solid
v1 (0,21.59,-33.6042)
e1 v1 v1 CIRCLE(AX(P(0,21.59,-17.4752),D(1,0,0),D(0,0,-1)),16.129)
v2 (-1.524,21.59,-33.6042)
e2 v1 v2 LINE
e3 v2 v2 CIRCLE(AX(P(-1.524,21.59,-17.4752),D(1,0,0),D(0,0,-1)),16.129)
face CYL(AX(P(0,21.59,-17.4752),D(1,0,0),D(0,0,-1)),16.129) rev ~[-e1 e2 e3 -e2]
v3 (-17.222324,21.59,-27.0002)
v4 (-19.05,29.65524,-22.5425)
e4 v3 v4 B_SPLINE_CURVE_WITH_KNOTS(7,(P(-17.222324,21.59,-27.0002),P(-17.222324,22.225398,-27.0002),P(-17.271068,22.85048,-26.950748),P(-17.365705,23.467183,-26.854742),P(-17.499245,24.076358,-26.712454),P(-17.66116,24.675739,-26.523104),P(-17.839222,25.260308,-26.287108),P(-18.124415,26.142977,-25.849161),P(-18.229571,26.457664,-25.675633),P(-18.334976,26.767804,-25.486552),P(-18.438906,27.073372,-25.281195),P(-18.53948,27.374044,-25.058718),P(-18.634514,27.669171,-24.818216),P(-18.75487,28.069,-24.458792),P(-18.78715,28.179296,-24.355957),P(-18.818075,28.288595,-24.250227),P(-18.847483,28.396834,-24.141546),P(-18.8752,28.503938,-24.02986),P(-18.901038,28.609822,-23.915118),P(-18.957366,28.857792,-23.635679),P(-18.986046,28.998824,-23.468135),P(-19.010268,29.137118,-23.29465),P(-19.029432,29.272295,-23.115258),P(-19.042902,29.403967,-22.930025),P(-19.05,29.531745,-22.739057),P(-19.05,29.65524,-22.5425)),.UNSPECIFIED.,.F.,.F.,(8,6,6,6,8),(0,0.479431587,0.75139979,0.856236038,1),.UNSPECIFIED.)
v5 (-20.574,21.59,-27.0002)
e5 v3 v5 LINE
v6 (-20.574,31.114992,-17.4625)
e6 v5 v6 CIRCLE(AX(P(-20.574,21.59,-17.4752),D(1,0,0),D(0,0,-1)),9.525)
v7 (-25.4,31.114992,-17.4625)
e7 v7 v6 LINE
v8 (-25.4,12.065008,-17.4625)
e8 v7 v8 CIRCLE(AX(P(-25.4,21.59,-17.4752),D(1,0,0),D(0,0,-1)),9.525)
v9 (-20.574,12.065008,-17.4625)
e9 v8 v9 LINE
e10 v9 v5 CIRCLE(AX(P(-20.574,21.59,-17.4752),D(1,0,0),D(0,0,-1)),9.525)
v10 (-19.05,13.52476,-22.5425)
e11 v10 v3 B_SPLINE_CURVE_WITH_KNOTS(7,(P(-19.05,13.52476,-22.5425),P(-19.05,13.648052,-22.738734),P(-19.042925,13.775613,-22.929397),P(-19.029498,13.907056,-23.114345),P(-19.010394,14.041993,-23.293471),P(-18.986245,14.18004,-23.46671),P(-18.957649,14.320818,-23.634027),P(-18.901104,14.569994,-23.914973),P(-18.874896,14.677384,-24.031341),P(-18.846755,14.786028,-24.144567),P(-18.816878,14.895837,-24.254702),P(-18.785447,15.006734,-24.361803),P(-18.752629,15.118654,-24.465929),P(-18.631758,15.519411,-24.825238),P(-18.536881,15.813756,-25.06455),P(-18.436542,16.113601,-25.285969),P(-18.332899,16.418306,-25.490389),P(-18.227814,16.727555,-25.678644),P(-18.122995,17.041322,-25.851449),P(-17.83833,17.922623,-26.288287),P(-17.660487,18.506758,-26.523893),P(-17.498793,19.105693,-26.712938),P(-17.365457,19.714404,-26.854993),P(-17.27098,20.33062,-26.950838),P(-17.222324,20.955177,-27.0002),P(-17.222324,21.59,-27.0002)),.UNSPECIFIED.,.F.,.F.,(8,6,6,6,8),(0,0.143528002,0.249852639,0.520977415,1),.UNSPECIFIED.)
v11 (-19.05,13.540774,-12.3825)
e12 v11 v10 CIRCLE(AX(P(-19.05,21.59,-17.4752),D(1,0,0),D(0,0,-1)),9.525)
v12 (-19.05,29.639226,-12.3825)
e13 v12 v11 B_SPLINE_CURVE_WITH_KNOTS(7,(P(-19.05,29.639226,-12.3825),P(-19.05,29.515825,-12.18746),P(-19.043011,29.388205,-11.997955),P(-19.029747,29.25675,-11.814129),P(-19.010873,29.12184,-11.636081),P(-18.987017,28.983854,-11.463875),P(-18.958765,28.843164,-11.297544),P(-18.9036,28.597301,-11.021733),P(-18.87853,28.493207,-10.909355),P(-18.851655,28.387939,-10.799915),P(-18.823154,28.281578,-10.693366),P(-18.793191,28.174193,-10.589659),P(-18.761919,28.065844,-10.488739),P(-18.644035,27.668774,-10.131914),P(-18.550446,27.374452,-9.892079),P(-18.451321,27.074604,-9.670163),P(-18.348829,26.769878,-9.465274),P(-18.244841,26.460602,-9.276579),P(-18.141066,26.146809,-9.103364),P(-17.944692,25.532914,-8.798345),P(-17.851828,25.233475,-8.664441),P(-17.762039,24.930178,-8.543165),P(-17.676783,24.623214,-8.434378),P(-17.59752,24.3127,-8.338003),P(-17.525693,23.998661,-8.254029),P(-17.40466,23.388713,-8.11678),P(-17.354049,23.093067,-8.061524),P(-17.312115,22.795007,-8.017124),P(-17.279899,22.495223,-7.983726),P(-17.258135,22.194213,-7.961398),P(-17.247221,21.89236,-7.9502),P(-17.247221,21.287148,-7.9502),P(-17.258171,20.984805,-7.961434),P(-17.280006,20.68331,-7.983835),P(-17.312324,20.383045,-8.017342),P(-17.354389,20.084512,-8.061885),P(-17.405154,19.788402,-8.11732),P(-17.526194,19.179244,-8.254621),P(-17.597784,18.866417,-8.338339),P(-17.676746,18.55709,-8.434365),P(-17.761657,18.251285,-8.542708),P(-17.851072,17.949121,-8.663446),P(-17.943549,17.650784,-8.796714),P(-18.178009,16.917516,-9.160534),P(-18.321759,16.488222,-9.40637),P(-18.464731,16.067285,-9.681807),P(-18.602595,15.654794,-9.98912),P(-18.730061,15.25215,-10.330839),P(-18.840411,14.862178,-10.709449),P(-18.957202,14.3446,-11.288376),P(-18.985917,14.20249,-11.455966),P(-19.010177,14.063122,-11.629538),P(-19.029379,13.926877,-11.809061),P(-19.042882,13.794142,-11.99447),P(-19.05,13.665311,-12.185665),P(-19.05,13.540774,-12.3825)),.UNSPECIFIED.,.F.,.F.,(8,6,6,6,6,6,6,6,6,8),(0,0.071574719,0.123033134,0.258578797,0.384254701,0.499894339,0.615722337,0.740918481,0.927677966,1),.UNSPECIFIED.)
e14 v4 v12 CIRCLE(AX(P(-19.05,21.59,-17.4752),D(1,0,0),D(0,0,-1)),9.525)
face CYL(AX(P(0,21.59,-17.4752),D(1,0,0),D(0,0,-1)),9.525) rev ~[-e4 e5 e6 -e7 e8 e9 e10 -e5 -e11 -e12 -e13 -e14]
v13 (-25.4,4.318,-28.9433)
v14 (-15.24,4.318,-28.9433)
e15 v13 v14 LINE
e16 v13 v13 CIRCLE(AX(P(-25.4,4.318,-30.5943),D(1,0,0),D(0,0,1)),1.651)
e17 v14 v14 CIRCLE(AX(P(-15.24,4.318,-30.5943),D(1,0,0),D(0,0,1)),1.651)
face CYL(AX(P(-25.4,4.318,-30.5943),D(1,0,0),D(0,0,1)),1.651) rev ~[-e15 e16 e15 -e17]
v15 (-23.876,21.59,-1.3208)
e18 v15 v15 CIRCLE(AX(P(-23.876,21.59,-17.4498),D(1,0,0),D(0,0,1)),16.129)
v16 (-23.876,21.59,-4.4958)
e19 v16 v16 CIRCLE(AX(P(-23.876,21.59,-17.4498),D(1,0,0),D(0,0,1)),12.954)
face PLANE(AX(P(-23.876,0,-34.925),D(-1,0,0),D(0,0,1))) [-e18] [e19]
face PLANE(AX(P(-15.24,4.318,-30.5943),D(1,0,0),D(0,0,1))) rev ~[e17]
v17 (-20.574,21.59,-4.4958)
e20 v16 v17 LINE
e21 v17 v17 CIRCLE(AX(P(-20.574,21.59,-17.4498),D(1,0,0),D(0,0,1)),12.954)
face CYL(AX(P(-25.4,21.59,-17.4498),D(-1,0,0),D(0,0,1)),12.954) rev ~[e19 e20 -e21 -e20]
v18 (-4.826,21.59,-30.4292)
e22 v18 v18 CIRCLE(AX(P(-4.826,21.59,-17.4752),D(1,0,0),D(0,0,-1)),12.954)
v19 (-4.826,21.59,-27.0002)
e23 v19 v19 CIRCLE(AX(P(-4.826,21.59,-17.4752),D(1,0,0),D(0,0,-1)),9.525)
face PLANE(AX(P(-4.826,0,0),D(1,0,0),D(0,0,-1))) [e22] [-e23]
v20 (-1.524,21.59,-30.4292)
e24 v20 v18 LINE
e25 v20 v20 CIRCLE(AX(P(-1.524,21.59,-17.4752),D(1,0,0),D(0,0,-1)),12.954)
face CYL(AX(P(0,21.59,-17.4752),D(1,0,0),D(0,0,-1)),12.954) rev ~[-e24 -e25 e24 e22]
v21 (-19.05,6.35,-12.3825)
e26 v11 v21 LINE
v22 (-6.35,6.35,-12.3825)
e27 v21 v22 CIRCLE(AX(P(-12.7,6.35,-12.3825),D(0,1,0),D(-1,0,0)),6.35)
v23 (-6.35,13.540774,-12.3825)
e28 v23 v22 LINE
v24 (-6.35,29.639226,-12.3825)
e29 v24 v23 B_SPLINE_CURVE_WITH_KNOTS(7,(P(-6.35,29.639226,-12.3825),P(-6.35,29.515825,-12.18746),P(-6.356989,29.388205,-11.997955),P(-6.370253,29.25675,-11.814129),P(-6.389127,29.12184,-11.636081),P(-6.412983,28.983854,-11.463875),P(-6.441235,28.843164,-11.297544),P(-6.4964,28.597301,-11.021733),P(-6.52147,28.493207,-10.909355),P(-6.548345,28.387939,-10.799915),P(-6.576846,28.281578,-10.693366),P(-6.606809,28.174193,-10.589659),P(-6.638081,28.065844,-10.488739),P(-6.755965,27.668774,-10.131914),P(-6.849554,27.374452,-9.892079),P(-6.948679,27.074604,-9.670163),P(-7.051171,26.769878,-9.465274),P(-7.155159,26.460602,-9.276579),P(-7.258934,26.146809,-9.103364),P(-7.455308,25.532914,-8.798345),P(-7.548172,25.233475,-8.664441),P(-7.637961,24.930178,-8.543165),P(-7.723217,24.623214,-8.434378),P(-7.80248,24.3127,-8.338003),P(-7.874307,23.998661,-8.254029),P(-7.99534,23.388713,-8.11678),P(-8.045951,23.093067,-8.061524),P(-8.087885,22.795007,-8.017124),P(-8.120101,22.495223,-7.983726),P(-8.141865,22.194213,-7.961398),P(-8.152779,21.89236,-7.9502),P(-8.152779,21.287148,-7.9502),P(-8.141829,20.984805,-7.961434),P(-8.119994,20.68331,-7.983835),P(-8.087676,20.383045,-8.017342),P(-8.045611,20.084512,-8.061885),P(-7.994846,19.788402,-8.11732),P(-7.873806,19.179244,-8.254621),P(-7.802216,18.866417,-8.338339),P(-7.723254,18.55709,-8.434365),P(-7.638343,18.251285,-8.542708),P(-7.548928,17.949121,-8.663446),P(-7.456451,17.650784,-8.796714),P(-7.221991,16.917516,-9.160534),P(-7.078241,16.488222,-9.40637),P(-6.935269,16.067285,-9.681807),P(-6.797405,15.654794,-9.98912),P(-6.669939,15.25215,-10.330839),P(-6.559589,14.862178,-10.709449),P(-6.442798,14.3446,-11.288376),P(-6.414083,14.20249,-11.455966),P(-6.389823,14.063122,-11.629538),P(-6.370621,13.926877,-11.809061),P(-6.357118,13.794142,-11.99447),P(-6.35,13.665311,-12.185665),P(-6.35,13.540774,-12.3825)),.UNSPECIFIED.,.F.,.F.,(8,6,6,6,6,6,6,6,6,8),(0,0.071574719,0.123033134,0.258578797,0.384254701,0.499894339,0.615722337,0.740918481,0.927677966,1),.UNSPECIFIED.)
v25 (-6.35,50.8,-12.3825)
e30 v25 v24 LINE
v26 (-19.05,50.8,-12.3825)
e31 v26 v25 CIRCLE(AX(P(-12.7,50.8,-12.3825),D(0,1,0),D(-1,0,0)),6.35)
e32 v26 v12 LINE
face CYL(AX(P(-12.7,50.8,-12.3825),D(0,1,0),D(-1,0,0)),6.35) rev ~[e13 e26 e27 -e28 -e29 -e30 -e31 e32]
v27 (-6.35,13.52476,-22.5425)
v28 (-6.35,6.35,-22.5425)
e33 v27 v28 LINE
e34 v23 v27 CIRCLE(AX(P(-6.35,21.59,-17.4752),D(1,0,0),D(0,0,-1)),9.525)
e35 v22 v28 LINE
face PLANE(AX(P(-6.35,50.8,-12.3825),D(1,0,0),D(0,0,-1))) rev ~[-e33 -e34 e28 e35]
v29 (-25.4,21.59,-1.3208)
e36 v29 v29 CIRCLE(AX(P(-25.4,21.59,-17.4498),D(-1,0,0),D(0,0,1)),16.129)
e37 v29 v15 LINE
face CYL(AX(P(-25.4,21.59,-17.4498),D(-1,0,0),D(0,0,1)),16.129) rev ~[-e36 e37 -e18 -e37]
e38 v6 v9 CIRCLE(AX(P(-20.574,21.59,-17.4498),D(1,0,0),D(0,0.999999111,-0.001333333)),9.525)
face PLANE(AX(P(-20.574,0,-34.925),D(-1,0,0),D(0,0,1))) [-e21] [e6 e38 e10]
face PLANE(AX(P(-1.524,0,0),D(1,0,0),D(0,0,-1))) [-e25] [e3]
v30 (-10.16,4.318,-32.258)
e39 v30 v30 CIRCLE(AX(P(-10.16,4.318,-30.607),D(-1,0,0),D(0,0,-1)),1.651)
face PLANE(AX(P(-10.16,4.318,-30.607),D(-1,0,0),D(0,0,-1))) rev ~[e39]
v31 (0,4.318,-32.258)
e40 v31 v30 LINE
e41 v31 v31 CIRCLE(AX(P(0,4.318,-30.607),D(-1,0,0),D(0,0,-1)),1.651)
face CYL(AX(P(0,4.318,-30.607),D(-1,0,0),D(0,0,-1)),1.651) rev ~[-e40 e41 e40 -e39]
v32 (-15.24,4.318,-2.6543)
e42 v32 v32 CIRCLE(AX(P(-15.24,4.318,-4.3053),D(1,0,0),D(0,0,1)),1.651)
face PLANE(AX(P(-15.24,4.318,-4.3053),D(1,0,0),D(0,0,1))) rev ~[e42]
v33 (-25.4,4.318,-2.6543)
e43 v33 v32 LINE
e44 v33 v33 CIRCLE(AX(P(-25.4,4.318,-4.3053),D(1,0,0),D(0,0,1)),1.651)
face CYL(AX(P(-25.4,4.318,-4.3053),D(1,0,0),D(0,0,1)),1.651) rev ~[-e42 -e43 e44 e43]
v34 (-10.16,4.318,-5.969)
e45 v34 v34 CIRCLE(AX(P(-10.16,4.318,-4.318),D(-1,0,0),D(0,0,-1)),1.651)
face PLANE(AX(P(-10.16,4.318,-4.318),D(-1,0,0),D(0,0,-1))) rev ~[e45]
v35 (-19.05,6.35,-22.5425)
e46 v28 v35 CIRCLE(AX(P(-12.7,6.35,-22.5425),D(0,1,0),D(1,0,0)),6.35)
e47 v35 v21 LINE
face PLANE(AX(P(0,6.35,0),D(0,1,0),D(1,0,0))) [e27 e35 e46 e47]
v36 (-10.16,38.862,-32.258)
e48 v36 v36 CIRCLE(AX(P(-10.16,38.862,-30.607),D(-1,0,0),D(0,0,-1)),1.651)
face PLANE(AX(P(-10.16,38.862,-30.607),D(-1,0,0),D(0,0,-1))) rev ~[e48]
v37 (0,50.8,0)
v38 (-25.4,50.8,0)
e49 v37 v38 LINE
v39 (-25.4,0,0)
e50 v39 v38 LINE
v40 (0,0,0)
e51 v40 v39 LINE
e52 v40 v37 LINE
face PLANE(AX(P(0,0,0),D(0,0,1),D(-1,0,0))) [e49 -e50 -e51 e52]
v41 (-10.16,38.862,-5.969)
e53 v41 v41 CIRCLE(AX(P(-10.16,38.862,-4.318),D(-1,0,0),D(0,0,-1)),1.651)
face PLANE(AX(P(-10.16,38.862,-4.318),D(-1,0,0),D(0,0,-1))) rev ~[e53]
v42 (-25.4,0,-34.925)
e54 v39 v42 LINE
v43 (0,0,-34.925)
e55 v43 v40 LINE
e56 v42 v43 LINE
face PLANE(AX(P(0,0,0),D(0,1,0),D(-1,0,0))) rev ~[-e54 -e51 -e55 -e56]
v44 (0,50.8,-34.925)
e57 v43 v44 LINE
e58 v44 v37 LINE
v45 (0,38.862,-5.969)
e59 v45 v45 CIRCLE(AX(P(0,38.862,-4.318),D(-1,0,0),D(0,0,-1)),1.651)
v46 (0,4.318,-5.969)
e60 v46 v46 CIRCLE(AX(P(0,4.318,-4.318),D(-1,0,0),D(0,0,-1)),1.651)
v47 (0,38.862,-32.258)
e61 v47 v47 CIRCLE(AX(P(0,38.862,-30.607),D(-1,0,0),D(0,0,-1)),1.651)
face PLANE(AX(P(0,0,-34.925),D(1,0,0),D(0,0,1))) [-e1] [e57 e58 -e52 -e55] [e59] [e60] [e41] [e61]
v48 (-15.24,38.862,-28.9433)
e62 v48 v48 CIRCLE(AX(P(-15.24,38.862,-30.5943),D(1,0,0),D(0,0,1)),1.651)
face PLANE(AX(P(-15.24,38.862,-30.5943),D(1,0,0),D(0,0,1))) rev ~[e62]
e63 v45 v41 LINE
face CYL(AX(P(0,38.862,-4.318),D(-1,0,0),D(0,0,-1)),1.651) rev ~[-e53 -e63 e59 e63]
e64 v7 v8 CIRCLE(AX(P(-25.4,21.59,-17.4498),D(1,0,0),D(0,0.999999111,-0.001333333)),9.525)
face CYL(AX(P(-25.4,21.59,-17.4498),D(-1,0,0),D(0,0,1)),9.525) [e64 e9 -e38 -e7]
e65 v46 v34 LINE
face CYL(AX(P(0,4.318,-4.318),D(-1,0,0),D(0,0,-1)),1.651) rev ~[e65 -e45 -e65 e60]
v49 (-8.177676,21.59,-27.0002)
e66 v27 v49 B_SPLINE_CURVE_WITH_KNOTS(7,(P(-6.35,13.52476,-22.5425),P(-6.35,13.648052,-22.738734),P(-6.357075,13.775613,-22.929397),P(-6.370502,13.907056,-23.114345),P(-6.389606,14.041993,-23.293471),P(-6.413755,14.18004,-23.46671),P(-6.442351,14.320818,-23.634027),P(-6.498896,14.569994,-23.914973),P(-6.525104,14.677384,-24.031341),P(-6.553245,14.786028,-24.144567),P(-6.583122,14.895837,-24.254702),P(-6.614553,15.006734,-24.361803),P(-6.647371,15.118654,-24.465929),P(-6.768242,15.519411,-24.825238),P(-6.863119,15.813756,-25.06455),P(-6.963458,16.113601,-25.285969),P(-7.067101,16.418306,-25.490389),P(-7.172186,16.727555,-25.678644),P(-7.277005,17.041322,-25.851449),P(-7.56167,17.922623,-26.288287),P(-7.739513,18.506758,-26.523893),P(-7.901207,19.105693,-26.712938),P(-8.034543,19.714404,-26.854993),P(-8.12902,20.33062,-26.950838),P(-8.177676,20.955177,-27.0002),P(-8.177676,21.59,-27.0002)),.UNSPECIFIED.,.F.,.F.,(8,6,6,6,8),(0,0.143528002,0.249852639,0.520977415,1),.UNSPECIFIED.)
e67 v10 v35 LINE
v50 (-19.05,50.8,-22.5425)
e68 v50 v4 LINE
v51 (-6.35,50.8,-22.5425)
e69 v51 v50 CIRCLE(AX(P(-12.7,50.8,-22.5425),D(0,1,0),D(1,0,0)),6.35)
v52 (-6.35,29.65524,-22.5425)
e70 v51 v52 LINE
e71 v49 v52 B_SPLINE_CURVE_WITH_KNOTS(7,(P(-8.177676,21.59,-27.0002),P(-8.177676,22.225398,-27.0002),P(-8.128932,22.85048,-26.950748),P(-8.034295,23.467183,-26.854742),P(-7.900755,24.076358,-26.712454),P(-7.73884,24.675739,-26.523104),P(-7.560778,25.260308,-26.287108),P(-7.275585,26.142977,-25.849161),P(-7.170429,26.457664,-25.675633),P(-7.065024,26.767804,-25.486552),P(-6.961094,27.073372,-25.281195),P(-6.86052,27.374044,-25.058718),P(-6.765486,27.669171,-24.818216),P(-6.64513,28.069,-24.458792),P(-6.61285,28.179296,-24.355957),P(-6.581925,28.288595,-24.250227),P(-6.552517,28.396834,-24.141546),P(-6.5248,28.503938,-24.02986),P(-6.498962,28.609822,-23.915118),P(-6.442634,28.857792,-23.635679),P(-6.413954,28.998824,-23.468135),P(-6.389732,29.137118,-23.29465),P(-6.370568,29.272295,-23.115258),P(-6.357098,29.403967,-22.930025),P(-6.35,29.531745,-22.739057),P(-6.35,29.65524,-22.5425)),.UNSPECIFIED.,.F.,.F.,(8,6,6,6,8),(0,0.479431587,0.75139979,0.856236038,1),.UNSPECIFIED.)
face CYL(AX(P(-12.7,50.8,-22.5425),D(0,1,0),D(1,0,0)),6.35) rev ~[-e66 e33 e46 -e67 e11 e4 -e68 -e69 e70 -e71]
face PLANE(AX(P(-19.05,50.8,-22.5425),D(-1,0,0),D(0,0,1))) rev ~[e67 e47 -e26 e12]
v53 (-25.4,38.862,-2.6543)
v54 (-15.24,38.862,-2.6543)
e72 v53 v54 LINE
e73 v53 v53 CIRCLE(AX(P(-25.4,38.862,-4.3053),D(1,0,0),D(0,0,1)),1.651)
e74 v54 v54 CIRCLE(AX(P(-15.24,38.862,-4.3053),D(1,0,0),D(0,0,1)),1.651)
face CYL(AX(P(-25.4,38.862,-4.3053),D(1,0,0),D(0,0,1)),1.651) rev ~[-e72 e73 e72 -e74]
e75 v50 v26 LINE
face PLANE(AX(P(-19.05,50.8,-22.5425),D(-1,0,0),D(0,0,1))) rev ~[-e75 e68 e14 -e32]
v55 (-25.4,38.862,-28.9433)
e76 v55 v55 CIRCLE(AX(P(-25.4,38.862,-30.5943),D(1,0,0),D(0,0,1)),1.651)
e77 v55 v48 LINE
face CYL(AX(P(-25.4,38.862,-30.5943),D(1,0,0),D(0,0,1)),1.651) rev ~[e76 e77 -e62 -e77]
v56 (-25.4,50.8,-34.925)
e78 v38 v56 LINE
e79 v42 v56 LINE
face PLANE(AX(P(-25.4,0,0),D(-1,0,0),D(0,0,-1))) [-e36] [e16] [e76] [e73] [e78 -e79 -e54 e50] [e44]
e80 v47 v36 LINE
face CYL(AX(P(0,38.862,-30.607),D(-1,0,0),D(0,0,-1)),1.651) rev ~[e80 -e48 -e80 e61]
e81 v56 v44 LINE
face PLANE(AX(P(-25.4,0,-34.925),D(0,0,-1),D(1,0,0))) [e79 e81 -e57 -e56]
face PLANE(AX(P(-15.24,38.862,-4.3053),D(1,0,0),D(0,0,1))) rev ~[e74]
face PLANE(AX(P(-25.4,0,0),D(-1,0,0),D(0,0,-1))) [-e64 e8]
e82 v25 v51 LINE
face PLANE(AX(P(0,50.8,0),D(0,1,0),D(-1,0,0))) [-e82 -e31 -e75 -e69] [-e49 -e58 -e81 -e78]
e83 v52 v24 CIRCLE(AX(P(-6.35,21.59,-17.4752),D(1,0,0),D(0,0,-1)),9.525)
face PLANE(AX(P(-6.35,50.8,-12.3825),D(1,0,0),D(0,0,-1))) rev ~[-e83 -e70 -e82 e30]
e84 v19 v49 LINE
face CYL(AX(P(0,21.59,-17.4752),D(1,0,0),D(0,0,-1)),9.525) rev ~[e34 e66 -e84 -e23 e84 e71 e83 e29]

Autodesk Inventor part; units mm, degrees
ref_plane "YZ Plane" through (0, 0, 0) normal (1, 0, 0) x (0, 1, 0)
ref_plane "XZ Plane" through (0, 0, 0) normal (0, 1, 0) x (-1, 0, 0)
ref_plane "XY Plane" through (0, 0, 0) normal (0, 0, 1) x (1, 0, 0)
sketch "Sketch1" plane through (0, 0, 0) normal (0, 1, 0) x (-1, 0, 0)
  line L0 (0, 0) -> (25.4, 0)
  line L1 (25.4, 0) -> (25.4, -34.925)
  line L2 (25.4, -34.925) -> (0, -34.925)
  line L3 (0, -34.925) -> (0, 0)
  dimension "BlockW" = 25.4
  dimension "BlockL" = 34.925
extrude "Extrusion1" add sketch "Sketch1" along normal blind 50.8
sketch "Sketch2" plane through (0, 50.8, 0) normal (0, 1, 0) x (1, 0, 0)
  line L0 (0, 0) -> (-12.7, 0)
  line L1 (0, 17.4625) -> (0, 0)
  line L2 (-12.7, 22.5425) -> (-12.7, 12.3825) construction
  line L3 (-19.05, 22.5425) -> (-19.05, 12.3825)
  line L4 (-6.35, 12.3825) -> (-6.35, 22.5425)
  arc A0 (-6.35, 22.5425) -> (-19.05, 22.5425) centre (-12.7, 22.5425) ccw
  arc A1 (-19.05, 12.3825) -> (-6.35, 12.3825) centre (-12.7, 12.3825) ccw
  line L5 (-12.7, 17.4625) -> (-2.54, 17.4625) construction
  dimension "d4" = 12.7
  dimension "d5" = 17.4625
  dimension "d33" = 5.08
  dimension "d35" = 12.7
extrude "Extrusion7" cut sketch "Sketch2" against normal blind 44.45
sketch "Sketch3" plane through (0, 0, 0) normal (1, 0, 0) x (0, 0, -1)
  line L0 (0, 0) -> (17.4752, 0)
  line L1 (0, 21.59) -> (0, 0)
  circle A0 centre (17.4752, 21.59) radius 9.525
  circle A1 centre (17.4752, 21.59) radius 12.954
  circle A2 centre (17.4752, 21.59) radius 16.129
  line L2 (4.318, 21.59) -> (21.59, 21.59) construction
  point P0 (4.318, 38.862)
  dimension "d15" = 19.05
  dimension "d16" = 25.908
  dimension "d17" = 32.258
hole "Hole2" at (0, 38.862, -4.318) direction (-1, 0, 0) diameter 3.302 depth 10.16 thread size "8-32 UNC" class "2B" standard "ANSI Unified Screw Threads"
pattern_linear "Rectangular Pattern1" count 2 spacing 26.289 along (0, 0, -1) count 2 spacing 34.544 along (0, -1, 0) of "Hole2"
extrude "Extrusion2" cut sketch "Sketch3" against normal through all contours A0
extrude "Extrusion3" cut sketch "Sketch3" against normal blind 4.826 contours A1
extrude "Extrusion4" cut sketch "Sketch3" against normal blind 1.524 contours A2
sketch "Sketch4" plane through (-25.4, 0, -34.925) normal (-1, 0, 0) x (0, 0, 1)
  line L0 (0, 0) -> (17.4752, 0)
  line L1 (17.4752, 21.59) -> (0, 21.59)
  line L2 (0, 21.59) -> (0, 0)
  circle A0 centre (17.4752, 21.59) radius 9.525
  circle A1 centre (17.4752, 21.59) radius 12.954
  circle A2 centre (17.4752, 21.59) radius 16.129
  line L3 (17.4752, 21.59) -> (30.6197, 21.59)
  line L4 (30.6197, 21.59) -> (30.6197, 38.862)
  line L5 (30.6197, 38.862) -> (17.4752, 38.862)
  line L6 (17.4752, 38.862) -> (17.4752, 21.59)
  point P0 (34.925, 0)
  dimension "d24" = 17.4752
  dimension "d25" = 21.59
  dimension "d26" = 19.05
  dimension "d28" = 32.258
  dimension "d57" = 13.1445
  dimension "d58" = 17.272
extrude "Extrusion5" cut sketch "Sketch4" against normal blind 4.826 contours A0 L3 A1 L1 | L1 A1 L6 A0 | A0 L6 A1 L3
extrude "Extrusion6" cut sketch "Sketch4" against normal blind 1.524 contours A1 L3 L4 A2 L1 | L1 A2 L6 A1 | A1 L6 A2 L4 L3
hole "Hole3" at (-25.4, 38.862, -4.3053) direction (1, 0, 0) diameter 3.302 depth 10.16 thread size "8-32 UNC" class "2B" standard "ANSI Unified Screw Threads"
pattern_linear "Rectangular Pattern2" count 2 spacing 26.289 along (0, 0, -1) count 2 spacing 34.544 along (0, -1, 0) of "Hole3"
equation "\"d4\" = 0.5 * BlockW"
equation "\"d5\" = 0.5 * BlockL"
equation "\"d36\" = WellDepth"
equation "\"WellDepth\" = 44.45"
properties part number "VaporFlowBlock"
